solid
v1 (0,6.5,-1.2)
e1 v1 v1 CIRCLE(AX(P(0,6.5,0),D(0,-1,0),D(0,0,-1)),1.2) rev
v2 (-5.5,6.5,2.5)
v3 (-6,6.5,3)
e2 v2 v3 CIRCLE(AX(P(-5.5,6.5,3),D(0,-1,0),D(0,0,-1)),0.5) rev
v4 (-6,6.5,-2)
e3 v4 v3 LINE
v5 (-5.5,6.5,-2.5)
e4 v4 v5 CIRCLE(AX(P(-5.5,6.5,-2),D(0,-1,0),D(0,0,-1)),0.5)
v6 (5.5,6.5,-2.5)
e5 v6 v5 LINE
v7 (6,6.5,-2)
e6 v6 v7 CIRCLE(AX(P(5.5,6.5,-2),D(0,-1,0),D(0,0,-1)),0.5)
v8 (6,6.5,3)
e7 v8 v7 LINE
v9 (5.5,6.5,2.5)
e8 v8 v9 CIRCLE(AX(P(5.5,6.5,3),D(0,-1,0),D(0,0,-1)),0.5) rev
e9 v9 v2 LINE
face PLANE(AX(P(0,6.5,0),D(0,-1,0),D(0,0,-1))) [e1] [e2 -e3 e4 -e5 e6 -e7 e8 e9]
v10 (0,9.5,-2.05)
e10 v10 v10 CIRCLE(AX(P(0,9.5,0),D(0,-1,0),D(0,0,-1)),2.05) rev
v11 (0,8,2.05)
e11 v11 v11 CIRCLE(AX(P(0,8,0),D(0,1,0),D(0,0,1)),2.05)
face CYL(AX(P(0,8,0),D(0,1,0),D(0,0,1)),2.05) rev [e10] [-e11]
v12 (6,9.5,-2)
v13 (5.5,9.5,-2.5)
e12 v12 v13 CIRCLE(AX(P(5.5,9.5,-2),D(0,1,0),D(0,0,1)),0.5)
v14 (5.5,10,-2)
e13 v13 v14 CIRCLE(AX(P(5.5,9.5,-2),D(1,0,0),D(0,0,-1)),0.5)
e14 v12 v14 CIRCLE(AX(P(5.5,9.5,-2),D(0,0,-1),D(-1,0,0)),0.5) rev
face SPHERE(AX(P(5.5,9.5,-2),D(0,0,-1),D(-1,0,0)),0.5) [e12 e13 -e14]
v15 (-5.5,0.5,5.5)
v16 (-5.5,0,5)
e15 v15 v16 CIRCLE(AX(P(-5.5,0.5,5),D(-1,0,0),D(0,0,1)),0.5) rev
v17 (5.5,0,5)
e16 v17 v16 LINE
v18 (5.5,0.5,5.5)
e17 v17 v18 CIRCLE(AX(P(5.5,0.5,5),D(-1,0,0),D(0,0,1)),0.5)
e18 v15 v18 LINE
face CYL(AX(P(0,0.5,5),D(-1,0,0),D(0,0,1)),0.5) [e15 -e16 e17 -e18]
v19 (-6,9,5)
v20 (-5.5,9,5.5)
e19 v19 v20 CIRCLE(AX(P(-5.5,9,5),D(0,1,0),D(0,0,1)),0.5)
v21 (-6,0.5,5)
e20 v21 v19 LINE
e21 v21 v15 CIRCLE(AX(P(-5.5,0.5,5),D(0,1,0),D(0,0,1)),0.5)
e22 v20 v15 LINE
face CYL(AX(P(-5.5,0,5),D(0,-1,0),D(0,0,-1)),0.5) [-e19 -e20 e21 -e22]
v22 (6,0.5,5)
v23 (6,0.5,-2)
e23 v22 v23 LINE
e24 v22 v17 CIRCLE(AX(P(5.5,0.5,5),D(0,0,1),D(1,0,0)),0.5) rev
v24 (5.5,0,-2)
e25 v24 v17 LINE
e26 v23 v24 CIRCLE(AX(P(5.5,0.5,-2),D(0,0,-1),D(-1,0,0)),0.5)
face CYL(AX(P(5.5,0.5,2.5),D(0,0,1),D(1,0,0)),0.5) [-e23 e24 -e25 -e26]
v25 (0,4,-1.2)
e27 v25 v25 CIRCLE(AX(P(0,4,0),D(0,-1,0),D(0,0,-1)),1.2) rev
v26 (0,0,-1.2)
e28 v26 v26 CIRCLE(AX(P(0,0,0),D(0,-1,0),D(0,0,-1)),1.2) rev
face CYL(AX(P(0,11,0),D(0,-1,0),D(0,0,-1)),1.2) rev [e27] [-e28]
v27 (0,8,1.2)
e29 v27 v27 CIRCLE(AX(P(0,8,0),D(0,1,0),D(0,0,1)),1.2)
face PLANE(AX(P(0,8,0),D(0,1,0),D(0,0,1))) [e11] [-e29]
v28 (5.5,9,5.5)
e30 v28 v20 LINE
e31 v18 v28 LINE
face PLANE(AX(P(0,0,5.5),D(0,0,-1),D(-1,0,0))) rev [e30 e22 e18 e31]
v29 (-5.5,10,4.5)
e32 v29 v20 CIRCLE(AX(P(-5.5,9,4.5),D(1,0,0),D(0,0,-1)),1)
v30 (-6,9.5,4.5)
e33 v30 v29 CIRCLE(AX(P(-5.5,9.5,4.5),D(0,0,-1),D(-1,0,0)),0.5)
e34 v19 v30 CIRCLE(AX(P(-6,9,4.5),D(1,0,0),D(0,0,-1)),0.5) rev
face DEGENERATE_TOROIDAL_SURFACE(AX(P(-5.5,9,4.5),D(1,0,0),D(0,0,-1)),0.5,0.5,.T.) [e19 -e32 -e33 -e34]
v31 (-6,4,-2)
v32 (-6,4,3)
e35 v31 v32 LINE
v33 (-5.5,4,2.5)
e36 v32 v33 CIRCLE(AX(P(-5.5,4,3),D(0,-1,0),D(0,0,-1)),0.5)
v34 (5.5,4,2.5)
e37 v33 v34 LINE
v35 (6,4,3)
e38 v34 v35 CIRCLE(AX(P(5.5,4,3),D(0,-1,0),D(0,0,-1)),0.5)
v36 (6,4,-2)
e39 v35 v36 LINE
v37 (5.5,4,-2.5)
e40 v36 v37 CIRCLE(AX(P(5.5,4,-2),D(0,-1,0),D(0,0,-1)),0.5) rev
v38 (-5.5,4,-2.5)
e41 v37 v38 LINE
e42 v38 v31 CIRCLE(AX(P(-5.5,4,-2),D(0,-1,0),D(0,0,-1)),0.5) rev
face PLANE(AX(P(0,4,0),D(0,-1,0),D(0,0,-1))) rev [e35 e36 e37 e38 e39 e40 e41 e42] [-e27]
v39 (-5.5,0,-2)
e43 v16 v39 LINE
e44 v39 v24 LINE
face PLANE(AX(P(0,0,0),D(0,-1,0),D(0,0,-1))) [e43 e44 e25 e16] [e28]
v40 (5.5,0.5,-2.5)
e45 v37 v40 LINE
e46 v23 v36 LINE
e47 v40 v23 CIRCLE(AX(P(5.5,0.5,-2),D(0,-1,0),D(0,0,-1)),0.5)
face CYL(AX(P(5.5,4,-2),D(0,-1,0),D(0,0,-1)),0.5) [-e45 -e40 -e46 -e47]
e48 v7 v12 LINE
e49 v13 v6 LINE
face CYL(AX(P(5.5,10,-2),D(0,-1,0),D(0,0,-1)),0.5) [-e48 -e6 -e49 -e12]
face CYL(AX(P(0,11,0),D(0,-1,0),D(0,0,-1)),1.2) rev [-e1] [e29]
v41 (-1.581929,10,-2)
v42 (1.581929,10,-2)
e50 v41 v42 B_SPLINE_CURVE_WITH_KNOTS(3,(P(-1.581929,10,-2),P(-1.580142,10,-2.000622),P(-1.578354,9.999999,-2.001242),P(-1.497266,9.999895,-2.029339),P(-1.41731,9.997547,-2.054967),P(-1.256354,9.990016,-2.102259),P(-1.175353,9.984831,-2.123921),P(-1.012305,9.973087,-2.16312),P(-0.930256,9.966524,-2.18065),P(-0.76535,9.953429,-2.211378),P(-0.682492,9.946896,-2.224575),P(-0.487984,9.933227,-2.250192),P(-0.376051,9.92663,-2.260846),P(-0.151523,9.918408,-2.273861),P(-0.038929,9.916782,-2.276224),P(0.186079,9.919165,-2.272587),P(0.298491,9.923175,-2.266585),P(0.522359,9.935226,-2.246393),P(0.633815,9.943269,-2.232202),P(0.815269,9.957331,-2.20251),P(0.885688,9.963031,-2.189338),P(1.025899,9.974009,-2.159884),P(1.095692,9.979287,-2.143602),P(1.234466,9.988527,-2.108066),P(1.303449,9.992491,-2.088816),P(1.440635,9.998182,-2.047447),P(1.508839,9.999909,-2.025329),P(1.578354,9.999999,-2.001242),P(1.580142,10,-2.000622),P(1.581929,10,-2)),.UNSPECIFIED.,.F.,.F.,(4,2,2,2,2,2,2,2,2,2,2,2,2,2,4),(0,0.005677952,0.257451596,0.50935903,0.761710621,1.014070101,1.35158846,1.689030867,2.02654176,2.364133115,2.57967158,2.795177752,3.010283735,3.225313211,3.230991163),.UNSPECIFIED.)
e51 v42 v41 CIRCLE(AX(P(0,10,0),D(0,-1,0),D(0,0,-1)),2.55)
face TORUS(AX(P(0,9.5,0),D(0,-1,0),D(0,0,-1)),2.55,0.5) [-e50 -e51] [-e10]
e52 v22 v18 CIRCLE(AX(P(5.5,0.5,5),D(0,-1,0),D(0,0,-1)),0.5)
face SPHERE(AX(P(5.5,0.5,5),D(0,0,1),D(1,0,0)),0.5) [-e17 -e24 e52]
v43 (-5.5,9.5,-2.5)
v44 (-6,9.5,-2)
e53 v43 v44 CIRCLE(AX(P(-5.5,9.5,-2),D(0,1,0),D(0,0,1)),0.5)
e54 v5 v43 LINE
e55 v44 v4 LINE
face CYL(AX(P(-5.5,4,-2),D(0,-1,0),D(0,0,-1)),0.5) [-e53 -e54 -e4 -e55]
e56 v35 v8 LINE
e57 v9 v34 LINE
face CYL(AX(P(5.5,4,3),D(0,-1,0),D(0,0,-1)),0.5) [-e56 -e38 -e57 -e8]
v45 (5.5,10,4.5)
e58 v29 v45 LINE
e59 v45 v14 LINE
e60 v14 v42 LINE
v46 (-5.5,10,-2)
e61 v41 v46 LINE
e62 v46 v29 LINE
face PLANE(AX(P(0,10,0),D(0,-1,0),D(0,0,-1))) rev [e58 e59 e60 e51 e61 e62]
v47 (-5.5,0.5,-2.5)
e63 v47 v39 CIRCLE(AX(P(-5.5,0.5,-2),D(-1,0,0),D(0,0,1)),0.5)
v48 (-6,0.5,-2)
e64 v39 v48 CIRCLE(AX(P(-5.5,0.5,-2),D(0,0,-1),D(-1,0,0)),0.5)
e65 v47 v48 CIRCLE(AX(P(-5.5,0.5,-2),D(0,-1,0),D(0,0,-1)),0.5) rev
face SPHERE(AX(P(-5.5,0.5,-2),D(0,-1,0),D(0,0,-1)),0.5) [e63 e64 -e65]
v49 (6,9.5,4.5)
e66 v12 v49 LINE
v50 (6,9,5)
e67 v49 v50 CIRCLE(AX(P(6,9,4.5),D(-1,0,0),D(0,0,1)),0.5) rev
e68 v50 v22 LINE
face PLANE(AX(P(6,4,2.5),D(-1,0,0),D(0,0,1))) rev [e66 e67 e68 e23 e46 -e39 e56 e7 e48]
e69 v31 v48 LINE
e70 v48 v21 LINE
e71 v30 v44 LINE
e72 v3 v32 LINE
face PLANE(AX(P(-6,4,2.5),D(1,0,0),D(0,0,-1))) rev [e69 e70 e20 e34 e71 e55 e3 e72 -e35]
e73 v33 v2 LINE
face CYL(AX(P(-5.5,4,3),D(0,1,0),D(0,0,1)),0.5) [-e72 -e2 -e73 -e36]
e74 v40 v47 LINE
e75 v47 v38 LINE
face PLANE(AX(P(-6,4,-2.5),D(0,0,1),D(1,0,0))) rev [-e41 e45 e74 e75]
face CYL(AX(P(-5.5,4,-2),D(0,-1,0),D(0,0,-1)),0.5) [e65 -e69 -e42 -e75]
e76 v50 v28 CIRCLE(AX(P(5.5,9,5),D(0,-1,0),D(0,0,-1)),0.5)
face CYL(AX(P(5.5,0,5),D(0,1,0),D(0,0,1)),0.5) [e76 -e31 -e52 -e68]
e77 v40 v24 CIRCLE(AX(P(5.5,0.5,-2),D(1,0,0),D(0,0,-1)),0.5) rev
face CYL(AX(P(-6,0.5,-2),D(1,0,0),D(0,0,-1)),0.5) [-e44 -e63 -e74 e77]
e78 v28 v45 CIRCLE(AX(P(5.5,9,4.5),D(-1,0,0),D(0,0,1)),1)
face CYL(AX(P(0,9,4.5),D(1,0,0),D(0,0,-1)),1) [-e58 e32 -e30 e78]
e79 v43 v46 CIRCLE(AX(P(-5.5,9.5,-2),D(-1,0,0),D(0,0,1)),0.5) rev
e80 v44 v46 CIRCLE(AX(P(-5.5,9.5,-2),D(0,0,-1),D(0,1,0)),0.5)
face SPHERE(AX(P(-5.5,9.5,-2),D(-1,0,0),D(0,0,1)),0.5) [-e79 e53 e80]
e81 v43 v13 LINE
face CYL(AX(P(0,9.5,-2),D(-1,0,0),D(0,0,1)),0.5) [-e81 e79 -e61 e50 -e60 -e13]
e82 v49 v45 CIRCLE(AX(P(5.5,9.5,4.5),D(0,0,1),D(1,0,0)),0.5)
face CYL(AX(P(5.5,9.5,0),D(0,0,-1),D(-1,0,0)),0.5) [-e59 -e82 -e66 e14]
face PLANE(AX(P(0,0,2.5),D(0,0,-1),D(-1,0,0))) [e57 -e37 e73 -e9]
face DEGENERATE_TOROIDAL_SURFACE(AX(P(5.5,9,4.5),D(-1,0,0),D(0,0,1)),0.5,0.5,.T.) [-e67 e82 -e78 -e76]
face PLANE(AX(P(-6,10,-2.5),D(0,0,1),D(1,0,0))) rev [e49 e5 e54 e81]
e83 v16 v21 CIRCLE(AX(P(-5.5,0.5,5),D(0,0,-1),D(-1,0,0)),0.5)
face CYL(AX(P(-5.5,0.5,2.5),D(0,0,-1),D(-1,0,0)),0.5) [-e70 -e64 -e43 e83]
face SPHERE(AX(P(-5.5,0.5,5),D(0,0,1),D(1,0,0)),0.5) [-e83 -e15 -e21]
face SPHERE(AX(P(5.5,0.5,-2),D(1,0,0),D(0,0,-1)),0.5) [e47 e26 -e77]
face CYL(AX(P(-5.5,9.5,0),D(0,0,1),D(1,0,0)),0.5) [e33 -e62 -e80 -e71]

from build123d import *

# Parameters (mm, degrees)
SKETCH1_W               = 12
SKETCH1_H               = 5
BOSS_EXTRUDE1_DEPTH     = 4
SKETCH2_W               = 12
SKETCH2_H               = 6.5
BOSS_EXTRUDE2_DEPTH     = 3
SKETCH3_W               = 12
SKETCH3_H               = 8
BOSS_EXTRUDE3_DEPTH     = 3.5
CUT_EXTRUDE1_DEPTH      = 7
CUT_EXTRUDE1_DEPTH_BACK = 5
SKETCH4_R               = 1.2
SKETCH5_R               = 2.05
CUT_EXTRUDE2_DEPTH      = 2
FILLET3_R               = 0.5
FILLET6_R               = 1
FILLET7_R               = 0.5


with BuildPart() as part:
    # Sketch1 → Boss-Extrude1 (new body)
    with BuildSketch(Plane(origin=(0, 0, 0), x_dir=(1, 0, 0), z_dir=(0, 1, 0))):
        Rectangle(SKETCH1_W, SKETCH1_H)
    extrude(amount=BOSS_EXTRUDE1_DEPTH)

    # Sketch2 → Boss-Extrude2 (add)
    with BuildSketch(Plane.XY.offset(2.5)):
        with Locations((0, 3.25)):
            Rectangle(SKETCH2_W, SKETCH2_H)
    extrude(amount=BOSS_EXTRUDE2_DEPTH)

    # Sketch3 → Boss-Extrude3 (add)
    with BuildSketch(Plane(origin=(0, 6.5, 0), x_dir=(1, 0, 0), z_dir=(0, 1, 0))):
        with Locations((0, -1.5)):
            Rectangle(SKETCH3_W, SKETCH3_H)
    extrude(amount=BOSS_EXTRUDE3_DEPTH)

    # Sketch4 → Cut-Extrude1 (cut, two sides: drawn at the far end of the back side and taken through both)
    with BuildSketch(Plane(origin=(0, 4, 0), x_dir=(1, 0, 0), z_dir=(0, 1, 0)).offset(-CUT_EXTRUDE1_DEPTH_BACK)):
        with Locations(Location((0, 0, 0), (0, 0, 90))):
            Circle(SKETCH4_R)
    extrude(amount=CUT_EXTRUDE1_DEPTH + CUT_EXTRUDE1_DEPTH_BACK, mode=Mode.SUBTRACT)

    # Sketch5 → Cut-Extrude2 (cut)
    with BuildSketch(Plane(origin=(0, 10, 0), x_dir=(1, 0, 0), z_dir=(0, 1, 0))):
        with Locations(Location((0, 0, 0), (0, 0, 270))):
            Circle(SKETCH5_R)
    extrude(amount=-CUT_EXTRUDE2_DEPTH, mode=Mode.SUBTRACT)

    # Fillet3
    fillet3_edges = [part.edges().sort_by_distance(p)[0] for p in [
        (-6, 5.25, 2.5),
        (6, 5.25, 2.5),
        (0, 0, 5.5),
        (-6, 0, 1.5),
        (0, 0, -2.5),
        (6, 0, 1.5),
        (-6, 2, -2.5),
        (6, 2, -2.5),
    ]]
    fillet(fillet3_edges, radius=FILLET3_R)

    # Fillet6
    fillet6_edges = [part.edges().sort_by_distance(p)[0] for p in [
        (0, 10, 5.5),
    ]]
    fillet(fillet6_edges, radius=FILLET6_R)

    # Fillet7
    # the kernel refuses this fillet: 0.5 mm, written as the material it takes off along each edge
    with BuildSketch(Plane(origin=(5.5, 0.5, 5), x_dir=(0, 0, 1), z_dir=(1, 0, 0))) as fillet7_piece_1_section:
        Polygon((0, 0), (FILLET7_R, 0), (FILLET7_R, FILLET7_R), (0, FILLET7_R), align=None)
    fillet7_piece_1 = extrude(amount=FILLET7_R, mode=Mode.PRIVATE)
    fillet7_piece_1 = fillet7_piece_1 - Plane(origin=(5.5, 0.5, 5), x_dir=(0, 0.7071067811865475, -0.7071067811865475), z_dir=(1, 0, 0)) * Sphere(FILLET7_R, mode=Mode.PRIVATE)
    add(fillet7_piece_1, mode=Mode.SUBTRACT)
    with BuildSketch(Plane(origin=(-5.5, 0.5, 5), x_dir=(-1, 0, 0), z_dir=(0, 0, 1))) as fillet7_piece_2_section:
        Polygon((0, 0), (FILLET7_R, 0), (FILLET7_R, FILLET7_R), (0, FILLET7_R), align=None)
    fillet7_piece_2 = extrude(amount=FILLET7_R, mode=Mode.PRIVATE)
    fillet7_piece_2 = fillet7_piece_2 - Plane(origin=(-5.5, 0.5, 5), x_dir=(0.7071067811865475, 0.7071067811865475, 0), z_dir=(0, 0, 1)) * Sphere(FILLET7_R, mode=Mode.PRIVATE)
    add(fillet7_piece_2, mode=Mode.SUBTRACT)
    with BuildSketch(Plane(origin=(5.5, 9.5, -2), x_dir=(0, 1, 0), z_dir=(1, 0, 0))) as fillet7_piece_3_section:
        Polygon((0, 0), (FILLET7_R, 0), (FILLET7_R, -FILLET7_R), (0, -FILLET7_R), align=None)
    fillet7_piece_3 = extrude(amount=FILLET7_R, mode=Mode.PRIVATE)
    fillet7_piece_3 = fillet7_piece_3 - Plane(origin=(5.5, 9.5, -2), x_dir=(0, -0.7071067811865475, 0.7071067811865475), z_dir=(1, 0, 0)) * Sphere(FILLET7_R, mode=Mode.PRIVATE)
    add(fillet7_piece_3, mode=Mode.SUBTRACT)
    with BuildSketch(Plane(origin=(-5.5, 9.5, -2), x_dir=(0, 1, 0), z_dir=(-1, 0, 0))) as fillet7_piece_4_section:
        Polygon((0, 0), (FILLET7_R, 0), (FILLET7_R, FILLET7_R), (0, FILLET7_R), align=None)
    fillet7_piece_4 = extrude(amount=FILLET7_R, mode=Mode.PRIVATE)
    fillet7_piece_4 = fillet7_piece_4 - Plane(origin=(-5.5, 9.5, -2), x_dir=(0, -0.7071067811865475, 0.7071067811865475), z_dir=(-1, 0, 0)) * Sphere(FILLET7_R, mode=Mode.PRIVATE)
    add(fillet7_piece_4, mode=Mode.SUBTRACT)
    with BuildSketch(Plane(origin=(6, 10, 4.5), x_dir=(0, -1, 0), z_dir=(0, 0, -1))) as fillet7_piece_5:
        with BuildLine():
            CenterArc((FILLET7_R, FILLET7_R), FILLET7_R, 180, 90)
            Line((0, FILLET7_R), (0, 0))
            Line((0, 0), (FILLET7_R, 0))
        make_face()
    extrude(amount=6.5, mode=Mode.SUBTRACT)
    with BuildSketch(Plane(origin=(6, 9, 4.5), x_dir=(0, 1, 0), z_dir=(0, 0, -1))) as fillet7_piece_6:
        with BuildLine():
            CenterArc((1 - FILLET7_R, -FILLET7_R), FILLET7_R, 0, 90)
            Line((1, -FILLET7_R), (1, 0))
            Line((1, 0), (1 - FILLET7_R, 0))
        make_face()
    revolve(axis=Axis((6, 9, 4.5), (1, 0, 0)), revolution_arc=90, mode=Mode.SUBTRACT)
    with BuildSketch(Plane(origin=(-6, 9, 5.5), x_dir=(1, 0, 0), z_dir=(0, -1, 0)), Plane(origin=(6, 9, 5.5), x_dir=(0, 0, -1), z_dir=(0, -1, 0))) as fillet7_piece_7:
        with BuildLine():
            CenterArc((FILLET7_R, -FILLET7_R), FILLET7_R, 90, 90)
            Line((0, -FILLET7_R), (0, 0))
            Line((0, 0), (FILLET7_R, 0))
        make_face()
    extrude(amount=8.5, mode=Mode.SUBTRACT)
    with BuildSketch(Plane(origin=(-6, 9, 4.5), x_dir=(0, 1, 0), z_dir=(0, 0, -1))) as fillet7_piece_8:
        with BuildLine():
            CenterArc((1 - FILLET7_R, FILLET7_R), FILLET7_R, 270, 90)
            Line((1 - FILLET7_R, 0), (1, 0))
            Line((1, 0), (1, FILLET7_R))
        make_face()
    revolve(axis=Axis((-6, 9, 4.5), (1, 0, 0)), revolution_arc=90, mode=Mode.SUBTRACT)
    with BuildSketch(Plane(origin=(-6, 5.25, -2.5), x_dir=(1, 0, 0), z_dir=(0, 1, 0)), Plane(origin=(6, 5.25, -2.5), x_dir=(0, 0, 1), z_dir=(0, 1, 0))) as fillet7_piece_9:
        with BuildLine():
            CenterArc((FILLET7_R, -FILLET7_R), FILLET7_R, 90, 90)
            Line((0, -FILLET7_R), (0, 0))
            Line((0, 0), (FILLET7_R, 0))
        make_face()
    extrude(amount=4.25, mode=Mode.SUBTRACT)
    with BuildSketch(Plane(origin=(-6, 10, -2), x_dir=(1, 0, 0), z_dir=(0, 0, 1))) as fillet7_piece_10:
        with BuildLine():
            CenterArc((FILLET7_R, -FILLET7_R), FILLET7_R, 90, 90)
            Line((0, -FILLET7_R), (0, 0))
            Line((0, 0), (FILLET7_R, 0))
        make_face()
    extrude(amount=6.5, mode=Mode.SUBTRACT)
    with BuildSketch(Plane(origin=(5.5, 10, -2.5), x_dir=(0, 0, 1), z_dir=(-1, 0, 0))) as fillet7_piece_11:
        with BuildLine():
            CenterArc((FILLET7_R, -FILLET7_R), FILLET7_R, 90, 90)
            Line((0, -FILLET7_R), (0, 0))
            Line((0, 0), (FILLET7_R, 0))
        make_face()
    extrude(amount=11, mode=Mode.SUBTRACT)
    with BuildSketch(Plane(origin=(0, 10, 0), x_dir=(0, 0, 1), z_dir=(-1, 0, 0))) as fillet7_piece_12:
        with BuildLine():
            CenterArc((2.05 + FILLET7_R, -FILLET7_R), FILLET7_R, 90, 90)
            Line((2.05, -FILLET7_R), (2.05, 0))
            Line((2.05, 0), (2.05 + FILLET7_R, 0))
        make_face()
    revolve(axis=Axis((0, 10, 0), (0, 1, 0)), mode=Mode.SUBTRACT)


solid = part.part
